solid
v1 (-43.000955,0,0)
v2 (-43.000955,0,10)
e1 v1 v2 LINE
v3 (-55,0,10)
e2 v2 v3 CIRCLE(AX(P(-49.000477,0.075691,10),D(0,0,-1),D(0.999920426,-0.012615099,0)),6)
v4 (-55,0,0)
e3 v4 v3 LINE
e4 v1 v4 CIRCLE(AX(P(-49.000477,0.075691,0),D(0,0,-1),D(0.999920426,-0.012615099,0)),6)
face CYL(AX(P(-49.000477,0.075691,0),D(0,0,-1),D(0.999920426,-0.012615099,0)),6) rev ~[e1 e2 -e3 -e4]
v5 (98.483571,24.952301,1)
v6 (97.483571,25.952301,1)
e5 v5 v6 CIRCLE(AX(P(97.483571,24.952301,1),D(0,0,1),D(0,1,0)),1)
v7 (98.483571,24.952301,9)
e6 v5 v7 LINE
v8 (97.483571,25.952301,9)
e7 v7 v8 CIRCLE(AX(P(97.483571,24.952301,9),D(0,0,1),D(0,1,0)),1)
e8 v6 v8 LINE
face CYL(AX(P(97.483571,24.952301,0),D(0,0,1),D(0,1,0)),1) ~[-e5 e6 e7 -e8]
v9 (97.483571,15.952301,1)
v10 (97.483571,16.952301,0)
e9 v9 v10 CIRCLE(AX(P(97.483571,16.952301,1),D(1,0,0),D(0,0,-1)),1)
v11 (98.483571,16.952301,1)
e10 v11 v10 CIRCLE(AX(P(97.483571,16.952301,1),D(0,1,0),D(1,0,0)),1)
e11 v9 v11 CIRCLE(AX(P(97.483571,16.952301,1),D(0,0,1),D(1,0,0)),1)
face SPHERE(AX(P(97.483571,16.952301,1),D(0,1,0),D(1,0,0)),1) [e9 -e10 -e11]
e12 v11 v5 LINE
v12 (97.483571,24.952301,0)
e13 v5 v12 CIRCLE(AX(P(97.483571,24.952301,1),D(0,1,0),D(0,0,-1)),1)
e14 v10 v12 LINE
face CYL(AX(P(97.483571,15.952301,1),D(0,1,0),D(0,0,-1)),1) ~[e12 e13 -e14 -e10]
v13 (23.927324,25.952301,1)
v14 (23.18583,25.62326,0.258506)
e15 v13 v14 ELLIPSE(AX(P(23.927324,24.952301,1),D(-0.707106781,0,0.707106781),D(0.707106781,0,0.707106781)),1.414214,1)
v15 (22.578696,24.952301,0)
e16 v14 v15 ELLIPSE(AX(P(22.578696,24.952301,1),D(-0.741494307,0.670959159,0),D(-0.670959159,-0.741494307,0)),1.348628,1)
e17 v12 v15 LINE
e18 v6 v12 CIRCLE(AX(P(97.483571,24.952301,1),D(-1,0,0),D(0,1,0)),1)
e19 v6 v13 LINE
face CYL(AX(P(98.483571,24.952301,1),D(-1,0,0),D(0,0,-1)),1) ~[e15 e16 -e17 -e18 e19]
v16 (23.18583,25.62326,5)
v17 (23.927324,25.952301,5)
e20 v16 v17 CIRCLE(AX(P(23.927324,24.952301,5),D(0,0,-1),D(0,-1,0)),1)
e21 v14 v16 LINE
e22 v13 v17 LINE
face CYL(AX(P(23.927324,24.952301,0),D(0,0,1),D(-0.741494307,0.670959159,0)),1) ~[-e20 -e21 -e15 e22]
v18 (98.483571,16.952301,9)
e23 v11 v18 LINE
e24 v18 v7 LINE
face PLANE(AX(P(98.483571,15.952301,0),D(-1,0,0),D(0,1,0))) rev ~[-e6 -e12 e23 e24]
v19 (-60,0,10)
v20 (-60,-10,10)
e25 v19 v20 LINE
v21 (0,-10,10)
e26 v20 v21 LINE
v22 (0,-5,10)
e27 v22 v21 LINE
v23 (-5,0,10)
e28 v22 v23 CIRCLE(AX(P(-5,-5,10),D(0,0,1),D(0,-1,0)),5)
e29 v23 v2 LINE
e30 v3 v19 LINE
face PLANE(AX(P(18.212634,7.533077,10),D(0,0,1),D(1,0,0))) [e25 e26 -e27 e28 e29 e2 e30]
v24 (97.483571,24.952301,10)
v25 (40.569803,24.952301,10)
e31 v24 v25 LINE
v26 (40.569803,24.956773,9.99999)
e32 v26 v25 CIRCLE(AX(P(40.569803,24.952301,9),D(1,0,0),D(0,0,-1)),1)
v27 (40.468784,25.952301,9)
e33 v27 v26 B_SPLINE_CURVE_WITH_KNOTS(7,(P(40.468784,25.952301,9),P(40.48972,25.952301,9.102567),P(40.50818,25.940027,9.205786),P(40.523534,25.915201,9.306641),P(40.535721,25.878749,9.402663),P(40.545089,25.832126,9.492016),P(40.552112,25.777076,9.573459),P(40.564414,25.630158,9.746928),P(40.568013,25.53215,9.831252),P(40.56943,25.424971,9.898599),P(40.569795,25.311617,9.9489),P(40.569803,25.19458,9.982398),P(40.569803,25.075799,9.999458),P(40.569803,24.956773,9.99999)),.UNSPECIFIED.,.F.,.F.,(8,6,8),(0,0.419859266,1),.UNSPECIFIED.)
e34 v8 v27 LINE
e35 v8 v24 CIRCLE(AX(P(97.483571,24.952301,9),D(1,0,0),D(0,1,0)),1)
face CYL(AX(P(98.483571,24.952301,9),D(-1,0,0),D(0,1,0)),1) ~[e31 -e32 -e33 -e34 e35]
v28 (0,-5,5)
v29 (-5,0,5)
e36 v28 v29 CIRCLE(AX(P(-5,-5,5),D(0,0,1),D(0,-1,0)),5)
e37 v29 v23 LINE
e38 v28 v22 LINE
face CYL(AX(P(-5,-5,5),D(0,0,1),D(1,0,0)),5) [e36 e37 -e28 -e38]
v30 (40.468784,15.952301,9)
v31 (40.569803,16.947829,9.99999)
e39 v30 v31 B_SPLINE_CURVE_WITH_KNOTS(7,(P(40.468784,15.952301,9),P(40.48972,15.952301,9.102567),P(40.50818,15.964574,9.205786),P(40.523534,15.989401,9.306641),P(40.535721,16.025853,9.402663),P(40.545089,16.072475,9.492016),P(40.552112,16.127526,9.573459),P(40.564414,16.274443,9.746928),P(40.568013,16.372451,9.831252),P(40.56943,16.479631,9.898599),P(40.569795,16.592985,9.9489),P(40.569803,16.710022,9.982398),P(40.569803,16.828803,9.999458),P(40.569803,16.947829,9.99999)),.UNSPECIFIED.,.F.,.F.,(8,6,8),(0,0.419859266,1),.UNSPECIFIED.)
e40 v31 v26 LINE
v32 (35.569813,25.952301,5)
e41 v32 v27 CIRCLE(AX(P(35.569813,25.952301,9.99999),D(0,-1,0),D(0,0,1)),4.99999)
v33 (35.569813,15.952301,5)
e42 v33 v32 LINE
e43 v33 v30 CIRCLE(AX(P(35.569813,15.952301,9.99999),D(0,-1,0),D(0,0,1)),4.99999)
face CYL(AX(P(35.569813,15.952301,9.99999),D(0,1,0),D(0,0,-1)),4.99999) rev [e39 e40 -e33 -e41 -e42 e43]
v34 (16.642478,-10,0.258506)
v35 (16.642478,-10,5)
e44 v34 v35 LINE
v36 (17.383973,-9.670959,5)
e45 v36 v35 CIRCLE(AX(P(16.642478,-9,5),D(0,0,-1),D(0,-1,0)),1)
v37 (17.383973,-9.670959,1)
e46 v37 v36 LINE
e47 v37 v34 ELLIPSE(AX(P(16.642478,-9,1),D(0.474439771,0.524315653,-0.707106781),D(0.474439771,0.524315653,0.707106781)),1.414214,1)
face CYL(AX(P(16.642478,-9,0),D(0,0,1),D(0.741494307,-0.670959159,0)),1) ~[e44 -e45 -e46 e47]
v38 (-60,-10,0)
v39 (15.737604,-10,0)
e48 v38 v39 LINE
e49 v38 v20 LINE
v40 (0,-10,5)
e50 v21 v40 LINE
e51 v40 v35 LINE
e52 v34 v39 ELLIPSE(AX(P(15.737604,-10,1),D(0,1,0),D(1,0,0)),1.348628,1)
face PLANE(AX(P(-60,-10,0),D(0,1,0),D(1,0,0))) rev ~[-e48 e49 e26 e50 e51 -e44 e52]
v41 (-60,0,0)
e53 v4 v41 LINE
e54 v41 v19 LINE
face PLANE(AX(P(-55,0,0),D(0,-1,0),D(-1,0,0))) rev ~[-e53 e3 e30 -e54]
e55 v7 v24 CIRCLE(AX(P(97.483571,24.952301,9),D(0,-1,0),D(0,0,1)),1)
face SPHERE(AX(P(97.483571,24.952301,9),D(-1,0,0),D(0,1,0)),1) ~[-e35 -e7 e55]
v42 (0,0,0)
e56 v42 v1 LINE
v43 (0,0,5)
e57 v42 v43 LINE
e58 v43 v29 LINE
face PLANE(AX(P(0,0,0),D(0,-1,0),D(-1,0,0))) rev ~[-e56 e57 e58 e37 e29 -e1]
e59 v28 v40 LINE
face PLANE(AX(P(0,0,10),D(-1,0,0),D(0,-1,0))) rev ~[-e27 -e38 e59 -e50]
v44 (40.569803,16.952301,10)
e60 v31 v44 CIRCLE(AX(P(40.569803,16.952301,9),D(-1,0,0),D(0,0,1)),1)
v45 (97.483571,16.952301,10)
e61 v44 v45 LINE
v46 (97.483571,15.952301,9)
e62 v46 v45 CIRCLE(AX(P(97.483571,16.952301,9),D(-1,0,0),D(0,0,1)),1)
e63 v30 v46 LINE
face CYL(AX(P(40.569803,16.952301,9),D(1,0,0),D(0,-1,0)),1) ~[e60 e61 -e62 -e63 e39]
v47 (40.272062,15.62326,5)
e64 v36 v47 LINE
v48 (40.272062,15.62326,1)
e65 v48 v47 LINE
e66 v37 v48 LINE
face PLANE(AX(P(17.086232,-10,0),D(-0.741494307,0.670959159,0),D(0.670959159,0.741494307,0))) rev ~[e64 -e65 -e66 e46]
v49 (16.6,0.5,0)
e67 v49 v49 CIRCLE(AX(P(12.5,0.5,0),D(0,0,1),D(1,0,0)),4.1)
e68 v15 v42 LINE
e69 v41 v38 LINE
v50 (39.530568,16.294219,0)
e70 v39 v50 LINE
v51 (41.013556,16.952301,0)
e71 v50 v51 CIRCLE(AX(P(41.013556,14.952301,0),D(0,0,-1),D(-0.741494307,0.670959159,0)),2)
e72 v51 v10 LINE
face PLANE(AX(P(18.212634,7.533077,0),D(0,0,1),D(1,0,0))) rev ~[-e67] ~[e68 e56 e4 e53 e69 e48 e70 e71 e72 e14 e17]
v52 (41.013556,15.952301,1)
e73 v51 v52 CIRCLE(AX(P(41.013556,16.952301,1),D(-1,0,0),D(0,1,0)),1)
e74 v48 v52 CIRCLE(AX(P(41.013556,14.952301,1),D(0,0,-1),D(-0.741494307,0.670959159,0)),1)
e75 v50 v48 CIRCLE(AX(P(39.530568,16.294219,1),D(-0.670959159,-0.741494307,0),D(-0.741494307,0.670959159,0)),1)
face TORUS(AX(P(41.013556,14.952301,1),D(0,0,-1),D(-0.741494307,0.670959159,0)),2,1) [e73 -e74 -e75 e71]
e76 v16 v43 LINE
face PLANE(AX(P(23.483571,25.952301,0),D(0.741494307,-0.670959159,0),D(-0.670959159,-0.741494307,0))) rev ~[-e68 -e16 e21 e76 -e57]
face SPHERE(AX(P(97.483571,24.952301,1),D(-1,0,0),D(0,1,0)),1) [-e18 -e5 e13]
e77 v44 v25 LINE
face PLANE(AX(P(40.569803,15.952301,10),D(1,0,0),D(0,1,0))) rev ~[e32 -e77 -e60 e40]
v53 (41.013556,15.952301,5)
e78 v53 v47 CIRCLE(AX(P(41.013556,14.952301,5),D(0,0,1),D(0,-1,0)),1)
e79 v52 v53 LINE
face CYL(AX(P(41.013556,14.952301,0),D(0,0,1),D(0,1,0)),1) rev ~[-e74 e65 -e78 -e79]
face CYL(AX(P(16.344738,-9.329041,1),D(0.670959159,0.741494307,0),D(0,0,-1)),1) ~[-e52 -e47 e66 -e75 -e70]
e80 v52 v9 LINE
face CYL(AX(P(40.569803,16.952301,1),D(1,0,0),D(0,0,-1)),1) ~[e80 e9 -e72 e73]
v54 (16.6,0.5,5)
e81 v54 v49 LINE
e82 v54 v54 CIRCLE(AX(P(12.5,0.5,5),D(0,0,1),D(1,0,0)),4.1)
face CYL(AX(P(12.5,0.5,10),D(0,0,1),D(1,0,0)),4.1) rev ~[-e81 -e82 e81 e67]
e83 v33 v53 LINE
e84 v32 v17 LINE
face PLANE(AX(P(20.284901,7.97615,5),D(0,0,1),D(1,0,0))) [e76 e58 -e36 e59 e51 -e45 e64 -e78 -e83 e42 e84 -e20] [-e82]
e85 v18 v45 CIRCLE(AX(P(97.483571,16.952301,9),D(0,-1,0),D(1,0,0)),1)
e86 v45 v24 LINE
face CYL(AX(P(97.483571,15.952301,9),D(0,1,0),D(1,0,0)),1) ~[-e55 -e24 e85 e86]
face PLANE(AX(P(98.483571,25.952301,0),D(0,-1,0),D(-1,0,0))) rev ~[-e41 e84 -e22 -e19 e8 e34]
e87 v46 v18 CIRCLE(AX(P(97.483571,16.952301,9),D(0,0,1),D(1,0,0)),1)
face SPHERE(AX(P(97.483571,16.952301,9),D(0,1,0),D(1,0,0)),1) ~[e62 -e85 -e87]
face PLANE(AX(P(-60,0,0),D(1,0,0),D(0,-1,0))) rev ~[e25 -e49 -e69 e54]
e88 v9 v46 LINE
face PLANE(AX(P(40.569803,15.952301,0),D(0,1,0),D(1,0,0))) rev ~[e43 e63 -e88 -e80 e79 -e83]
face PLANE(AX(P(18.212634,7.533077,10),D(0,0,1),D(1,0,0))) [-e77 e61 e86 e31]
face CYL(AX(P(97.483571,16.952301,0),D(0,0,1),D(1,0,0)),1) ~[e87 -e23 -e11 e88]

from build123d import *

# Parameters (mm, degrees)
F1_DEPTH = 10
F2_R     = 4.1
F3_DEPTH = 5
F4_DEPTH = 10
F5_R     = 1
F6_R     = 4.99999
F7_R     = 5


# Not quite as in the source:
# - a fillet or chamfer is up to 0.001 mm smaller than in the source, because OpenCascade refuses the exact size


with BuildPart() as f1:
    # F0 (on Top) → F1 (new body)
    with BuildSketch(Plane.XY):
        with BuildLine():
            Line((23.4835705605, 25.9523007406), (0, 0))
            Line((0, 0), (-43.0009548823, 0))
            ThreePointArc((-43.0009548823, 0), (-49.0004774411, -5.9243094089), (-55, 0))
            Line((-55, 0), (-60, 0))
            Line((-60, 0), (-60, -10))
            Line((-60, -10), (17.0862320811, -10))
            Line((17.0862320811, -10), (40.5698026416, 15.9523007406))
            Line((40.5698026416, 15.9523007406), (98.4835705605, 15.9523007406))
            Line((98.4835705605, 15.9523007406), (98.4835705605, 25.9523007406))
            Line((98.4835705605, 25.9523007406), (23.4835705605, 25.9523007406))
        make_face()
    extrude(amount=F1_DEPTH)

    # F2 (on face) → F3 (cut)
    with BuildSketch(Plane.XY.offset(10)):
        Polygon((0, -10), (17.0862320811, -10), (40.5698026416, 15.9523007406), (40.5698026416, 25.9523007406), (23.4835705605, 25.9523007406), (0, 0), align=None)
        with Locations((12.5, 0.5)):
            Circle(F2_R, mode=Mode.SUBTRACT)
    extrude(amount=-F3_DEPTH, mode=Mode.SUBTRACT)

    # F4 (cut, through all): a face of the model
    f4_faces = [f1.faces().sort_by_distance(p)[0] for p in [
        (12.5, 0.5, 10),
    ]]
    extrude(f4_faces, amount=-F4_DEPTH, mode=Mode.SUBTRACT)

    # F5
    f5_edges = [f1.edges().sort_by_distance(p)[0] for p in [
        (60.983571, 25.952301, 0),
        (69.526687, 25.952301, 10),
        (98.483571, 25.952301, 5),
        (98.483571, 20.952301, 0),
        (98.483571, 20.952301, 10),
        (98.483571, 15.952301, 5),
        (69.526687, 15.952301, 0),
        (69.526687, 15.952301, 10),
        (23.483571, 25.952301, 2.5),
        (17.086232, -10, 2.5),
        (40.569803, 15.952301, 2.5),
        (28.828017, 2.97615, 0),
    ]]
    fillet(f5_edges, radius=F5_R)

    # F6 (radius 5 in the source; OpenCascade refuses exactly that, so slightly less here)
    f6_edges = [f1.edges().sort_by_distance(p)[0] for p in [
        (40.569803, 20.952301, 5),
    ]]
    fillet(f6_edges, radius=F6_R)

    # F7
    f7_edges = [f1.edges().sort_by_distance(p)[0] for p in [
        (0, 0, 7.5),
    ]]
    fillet(f7_edges, radius=F7_R)


solid = f1.part
